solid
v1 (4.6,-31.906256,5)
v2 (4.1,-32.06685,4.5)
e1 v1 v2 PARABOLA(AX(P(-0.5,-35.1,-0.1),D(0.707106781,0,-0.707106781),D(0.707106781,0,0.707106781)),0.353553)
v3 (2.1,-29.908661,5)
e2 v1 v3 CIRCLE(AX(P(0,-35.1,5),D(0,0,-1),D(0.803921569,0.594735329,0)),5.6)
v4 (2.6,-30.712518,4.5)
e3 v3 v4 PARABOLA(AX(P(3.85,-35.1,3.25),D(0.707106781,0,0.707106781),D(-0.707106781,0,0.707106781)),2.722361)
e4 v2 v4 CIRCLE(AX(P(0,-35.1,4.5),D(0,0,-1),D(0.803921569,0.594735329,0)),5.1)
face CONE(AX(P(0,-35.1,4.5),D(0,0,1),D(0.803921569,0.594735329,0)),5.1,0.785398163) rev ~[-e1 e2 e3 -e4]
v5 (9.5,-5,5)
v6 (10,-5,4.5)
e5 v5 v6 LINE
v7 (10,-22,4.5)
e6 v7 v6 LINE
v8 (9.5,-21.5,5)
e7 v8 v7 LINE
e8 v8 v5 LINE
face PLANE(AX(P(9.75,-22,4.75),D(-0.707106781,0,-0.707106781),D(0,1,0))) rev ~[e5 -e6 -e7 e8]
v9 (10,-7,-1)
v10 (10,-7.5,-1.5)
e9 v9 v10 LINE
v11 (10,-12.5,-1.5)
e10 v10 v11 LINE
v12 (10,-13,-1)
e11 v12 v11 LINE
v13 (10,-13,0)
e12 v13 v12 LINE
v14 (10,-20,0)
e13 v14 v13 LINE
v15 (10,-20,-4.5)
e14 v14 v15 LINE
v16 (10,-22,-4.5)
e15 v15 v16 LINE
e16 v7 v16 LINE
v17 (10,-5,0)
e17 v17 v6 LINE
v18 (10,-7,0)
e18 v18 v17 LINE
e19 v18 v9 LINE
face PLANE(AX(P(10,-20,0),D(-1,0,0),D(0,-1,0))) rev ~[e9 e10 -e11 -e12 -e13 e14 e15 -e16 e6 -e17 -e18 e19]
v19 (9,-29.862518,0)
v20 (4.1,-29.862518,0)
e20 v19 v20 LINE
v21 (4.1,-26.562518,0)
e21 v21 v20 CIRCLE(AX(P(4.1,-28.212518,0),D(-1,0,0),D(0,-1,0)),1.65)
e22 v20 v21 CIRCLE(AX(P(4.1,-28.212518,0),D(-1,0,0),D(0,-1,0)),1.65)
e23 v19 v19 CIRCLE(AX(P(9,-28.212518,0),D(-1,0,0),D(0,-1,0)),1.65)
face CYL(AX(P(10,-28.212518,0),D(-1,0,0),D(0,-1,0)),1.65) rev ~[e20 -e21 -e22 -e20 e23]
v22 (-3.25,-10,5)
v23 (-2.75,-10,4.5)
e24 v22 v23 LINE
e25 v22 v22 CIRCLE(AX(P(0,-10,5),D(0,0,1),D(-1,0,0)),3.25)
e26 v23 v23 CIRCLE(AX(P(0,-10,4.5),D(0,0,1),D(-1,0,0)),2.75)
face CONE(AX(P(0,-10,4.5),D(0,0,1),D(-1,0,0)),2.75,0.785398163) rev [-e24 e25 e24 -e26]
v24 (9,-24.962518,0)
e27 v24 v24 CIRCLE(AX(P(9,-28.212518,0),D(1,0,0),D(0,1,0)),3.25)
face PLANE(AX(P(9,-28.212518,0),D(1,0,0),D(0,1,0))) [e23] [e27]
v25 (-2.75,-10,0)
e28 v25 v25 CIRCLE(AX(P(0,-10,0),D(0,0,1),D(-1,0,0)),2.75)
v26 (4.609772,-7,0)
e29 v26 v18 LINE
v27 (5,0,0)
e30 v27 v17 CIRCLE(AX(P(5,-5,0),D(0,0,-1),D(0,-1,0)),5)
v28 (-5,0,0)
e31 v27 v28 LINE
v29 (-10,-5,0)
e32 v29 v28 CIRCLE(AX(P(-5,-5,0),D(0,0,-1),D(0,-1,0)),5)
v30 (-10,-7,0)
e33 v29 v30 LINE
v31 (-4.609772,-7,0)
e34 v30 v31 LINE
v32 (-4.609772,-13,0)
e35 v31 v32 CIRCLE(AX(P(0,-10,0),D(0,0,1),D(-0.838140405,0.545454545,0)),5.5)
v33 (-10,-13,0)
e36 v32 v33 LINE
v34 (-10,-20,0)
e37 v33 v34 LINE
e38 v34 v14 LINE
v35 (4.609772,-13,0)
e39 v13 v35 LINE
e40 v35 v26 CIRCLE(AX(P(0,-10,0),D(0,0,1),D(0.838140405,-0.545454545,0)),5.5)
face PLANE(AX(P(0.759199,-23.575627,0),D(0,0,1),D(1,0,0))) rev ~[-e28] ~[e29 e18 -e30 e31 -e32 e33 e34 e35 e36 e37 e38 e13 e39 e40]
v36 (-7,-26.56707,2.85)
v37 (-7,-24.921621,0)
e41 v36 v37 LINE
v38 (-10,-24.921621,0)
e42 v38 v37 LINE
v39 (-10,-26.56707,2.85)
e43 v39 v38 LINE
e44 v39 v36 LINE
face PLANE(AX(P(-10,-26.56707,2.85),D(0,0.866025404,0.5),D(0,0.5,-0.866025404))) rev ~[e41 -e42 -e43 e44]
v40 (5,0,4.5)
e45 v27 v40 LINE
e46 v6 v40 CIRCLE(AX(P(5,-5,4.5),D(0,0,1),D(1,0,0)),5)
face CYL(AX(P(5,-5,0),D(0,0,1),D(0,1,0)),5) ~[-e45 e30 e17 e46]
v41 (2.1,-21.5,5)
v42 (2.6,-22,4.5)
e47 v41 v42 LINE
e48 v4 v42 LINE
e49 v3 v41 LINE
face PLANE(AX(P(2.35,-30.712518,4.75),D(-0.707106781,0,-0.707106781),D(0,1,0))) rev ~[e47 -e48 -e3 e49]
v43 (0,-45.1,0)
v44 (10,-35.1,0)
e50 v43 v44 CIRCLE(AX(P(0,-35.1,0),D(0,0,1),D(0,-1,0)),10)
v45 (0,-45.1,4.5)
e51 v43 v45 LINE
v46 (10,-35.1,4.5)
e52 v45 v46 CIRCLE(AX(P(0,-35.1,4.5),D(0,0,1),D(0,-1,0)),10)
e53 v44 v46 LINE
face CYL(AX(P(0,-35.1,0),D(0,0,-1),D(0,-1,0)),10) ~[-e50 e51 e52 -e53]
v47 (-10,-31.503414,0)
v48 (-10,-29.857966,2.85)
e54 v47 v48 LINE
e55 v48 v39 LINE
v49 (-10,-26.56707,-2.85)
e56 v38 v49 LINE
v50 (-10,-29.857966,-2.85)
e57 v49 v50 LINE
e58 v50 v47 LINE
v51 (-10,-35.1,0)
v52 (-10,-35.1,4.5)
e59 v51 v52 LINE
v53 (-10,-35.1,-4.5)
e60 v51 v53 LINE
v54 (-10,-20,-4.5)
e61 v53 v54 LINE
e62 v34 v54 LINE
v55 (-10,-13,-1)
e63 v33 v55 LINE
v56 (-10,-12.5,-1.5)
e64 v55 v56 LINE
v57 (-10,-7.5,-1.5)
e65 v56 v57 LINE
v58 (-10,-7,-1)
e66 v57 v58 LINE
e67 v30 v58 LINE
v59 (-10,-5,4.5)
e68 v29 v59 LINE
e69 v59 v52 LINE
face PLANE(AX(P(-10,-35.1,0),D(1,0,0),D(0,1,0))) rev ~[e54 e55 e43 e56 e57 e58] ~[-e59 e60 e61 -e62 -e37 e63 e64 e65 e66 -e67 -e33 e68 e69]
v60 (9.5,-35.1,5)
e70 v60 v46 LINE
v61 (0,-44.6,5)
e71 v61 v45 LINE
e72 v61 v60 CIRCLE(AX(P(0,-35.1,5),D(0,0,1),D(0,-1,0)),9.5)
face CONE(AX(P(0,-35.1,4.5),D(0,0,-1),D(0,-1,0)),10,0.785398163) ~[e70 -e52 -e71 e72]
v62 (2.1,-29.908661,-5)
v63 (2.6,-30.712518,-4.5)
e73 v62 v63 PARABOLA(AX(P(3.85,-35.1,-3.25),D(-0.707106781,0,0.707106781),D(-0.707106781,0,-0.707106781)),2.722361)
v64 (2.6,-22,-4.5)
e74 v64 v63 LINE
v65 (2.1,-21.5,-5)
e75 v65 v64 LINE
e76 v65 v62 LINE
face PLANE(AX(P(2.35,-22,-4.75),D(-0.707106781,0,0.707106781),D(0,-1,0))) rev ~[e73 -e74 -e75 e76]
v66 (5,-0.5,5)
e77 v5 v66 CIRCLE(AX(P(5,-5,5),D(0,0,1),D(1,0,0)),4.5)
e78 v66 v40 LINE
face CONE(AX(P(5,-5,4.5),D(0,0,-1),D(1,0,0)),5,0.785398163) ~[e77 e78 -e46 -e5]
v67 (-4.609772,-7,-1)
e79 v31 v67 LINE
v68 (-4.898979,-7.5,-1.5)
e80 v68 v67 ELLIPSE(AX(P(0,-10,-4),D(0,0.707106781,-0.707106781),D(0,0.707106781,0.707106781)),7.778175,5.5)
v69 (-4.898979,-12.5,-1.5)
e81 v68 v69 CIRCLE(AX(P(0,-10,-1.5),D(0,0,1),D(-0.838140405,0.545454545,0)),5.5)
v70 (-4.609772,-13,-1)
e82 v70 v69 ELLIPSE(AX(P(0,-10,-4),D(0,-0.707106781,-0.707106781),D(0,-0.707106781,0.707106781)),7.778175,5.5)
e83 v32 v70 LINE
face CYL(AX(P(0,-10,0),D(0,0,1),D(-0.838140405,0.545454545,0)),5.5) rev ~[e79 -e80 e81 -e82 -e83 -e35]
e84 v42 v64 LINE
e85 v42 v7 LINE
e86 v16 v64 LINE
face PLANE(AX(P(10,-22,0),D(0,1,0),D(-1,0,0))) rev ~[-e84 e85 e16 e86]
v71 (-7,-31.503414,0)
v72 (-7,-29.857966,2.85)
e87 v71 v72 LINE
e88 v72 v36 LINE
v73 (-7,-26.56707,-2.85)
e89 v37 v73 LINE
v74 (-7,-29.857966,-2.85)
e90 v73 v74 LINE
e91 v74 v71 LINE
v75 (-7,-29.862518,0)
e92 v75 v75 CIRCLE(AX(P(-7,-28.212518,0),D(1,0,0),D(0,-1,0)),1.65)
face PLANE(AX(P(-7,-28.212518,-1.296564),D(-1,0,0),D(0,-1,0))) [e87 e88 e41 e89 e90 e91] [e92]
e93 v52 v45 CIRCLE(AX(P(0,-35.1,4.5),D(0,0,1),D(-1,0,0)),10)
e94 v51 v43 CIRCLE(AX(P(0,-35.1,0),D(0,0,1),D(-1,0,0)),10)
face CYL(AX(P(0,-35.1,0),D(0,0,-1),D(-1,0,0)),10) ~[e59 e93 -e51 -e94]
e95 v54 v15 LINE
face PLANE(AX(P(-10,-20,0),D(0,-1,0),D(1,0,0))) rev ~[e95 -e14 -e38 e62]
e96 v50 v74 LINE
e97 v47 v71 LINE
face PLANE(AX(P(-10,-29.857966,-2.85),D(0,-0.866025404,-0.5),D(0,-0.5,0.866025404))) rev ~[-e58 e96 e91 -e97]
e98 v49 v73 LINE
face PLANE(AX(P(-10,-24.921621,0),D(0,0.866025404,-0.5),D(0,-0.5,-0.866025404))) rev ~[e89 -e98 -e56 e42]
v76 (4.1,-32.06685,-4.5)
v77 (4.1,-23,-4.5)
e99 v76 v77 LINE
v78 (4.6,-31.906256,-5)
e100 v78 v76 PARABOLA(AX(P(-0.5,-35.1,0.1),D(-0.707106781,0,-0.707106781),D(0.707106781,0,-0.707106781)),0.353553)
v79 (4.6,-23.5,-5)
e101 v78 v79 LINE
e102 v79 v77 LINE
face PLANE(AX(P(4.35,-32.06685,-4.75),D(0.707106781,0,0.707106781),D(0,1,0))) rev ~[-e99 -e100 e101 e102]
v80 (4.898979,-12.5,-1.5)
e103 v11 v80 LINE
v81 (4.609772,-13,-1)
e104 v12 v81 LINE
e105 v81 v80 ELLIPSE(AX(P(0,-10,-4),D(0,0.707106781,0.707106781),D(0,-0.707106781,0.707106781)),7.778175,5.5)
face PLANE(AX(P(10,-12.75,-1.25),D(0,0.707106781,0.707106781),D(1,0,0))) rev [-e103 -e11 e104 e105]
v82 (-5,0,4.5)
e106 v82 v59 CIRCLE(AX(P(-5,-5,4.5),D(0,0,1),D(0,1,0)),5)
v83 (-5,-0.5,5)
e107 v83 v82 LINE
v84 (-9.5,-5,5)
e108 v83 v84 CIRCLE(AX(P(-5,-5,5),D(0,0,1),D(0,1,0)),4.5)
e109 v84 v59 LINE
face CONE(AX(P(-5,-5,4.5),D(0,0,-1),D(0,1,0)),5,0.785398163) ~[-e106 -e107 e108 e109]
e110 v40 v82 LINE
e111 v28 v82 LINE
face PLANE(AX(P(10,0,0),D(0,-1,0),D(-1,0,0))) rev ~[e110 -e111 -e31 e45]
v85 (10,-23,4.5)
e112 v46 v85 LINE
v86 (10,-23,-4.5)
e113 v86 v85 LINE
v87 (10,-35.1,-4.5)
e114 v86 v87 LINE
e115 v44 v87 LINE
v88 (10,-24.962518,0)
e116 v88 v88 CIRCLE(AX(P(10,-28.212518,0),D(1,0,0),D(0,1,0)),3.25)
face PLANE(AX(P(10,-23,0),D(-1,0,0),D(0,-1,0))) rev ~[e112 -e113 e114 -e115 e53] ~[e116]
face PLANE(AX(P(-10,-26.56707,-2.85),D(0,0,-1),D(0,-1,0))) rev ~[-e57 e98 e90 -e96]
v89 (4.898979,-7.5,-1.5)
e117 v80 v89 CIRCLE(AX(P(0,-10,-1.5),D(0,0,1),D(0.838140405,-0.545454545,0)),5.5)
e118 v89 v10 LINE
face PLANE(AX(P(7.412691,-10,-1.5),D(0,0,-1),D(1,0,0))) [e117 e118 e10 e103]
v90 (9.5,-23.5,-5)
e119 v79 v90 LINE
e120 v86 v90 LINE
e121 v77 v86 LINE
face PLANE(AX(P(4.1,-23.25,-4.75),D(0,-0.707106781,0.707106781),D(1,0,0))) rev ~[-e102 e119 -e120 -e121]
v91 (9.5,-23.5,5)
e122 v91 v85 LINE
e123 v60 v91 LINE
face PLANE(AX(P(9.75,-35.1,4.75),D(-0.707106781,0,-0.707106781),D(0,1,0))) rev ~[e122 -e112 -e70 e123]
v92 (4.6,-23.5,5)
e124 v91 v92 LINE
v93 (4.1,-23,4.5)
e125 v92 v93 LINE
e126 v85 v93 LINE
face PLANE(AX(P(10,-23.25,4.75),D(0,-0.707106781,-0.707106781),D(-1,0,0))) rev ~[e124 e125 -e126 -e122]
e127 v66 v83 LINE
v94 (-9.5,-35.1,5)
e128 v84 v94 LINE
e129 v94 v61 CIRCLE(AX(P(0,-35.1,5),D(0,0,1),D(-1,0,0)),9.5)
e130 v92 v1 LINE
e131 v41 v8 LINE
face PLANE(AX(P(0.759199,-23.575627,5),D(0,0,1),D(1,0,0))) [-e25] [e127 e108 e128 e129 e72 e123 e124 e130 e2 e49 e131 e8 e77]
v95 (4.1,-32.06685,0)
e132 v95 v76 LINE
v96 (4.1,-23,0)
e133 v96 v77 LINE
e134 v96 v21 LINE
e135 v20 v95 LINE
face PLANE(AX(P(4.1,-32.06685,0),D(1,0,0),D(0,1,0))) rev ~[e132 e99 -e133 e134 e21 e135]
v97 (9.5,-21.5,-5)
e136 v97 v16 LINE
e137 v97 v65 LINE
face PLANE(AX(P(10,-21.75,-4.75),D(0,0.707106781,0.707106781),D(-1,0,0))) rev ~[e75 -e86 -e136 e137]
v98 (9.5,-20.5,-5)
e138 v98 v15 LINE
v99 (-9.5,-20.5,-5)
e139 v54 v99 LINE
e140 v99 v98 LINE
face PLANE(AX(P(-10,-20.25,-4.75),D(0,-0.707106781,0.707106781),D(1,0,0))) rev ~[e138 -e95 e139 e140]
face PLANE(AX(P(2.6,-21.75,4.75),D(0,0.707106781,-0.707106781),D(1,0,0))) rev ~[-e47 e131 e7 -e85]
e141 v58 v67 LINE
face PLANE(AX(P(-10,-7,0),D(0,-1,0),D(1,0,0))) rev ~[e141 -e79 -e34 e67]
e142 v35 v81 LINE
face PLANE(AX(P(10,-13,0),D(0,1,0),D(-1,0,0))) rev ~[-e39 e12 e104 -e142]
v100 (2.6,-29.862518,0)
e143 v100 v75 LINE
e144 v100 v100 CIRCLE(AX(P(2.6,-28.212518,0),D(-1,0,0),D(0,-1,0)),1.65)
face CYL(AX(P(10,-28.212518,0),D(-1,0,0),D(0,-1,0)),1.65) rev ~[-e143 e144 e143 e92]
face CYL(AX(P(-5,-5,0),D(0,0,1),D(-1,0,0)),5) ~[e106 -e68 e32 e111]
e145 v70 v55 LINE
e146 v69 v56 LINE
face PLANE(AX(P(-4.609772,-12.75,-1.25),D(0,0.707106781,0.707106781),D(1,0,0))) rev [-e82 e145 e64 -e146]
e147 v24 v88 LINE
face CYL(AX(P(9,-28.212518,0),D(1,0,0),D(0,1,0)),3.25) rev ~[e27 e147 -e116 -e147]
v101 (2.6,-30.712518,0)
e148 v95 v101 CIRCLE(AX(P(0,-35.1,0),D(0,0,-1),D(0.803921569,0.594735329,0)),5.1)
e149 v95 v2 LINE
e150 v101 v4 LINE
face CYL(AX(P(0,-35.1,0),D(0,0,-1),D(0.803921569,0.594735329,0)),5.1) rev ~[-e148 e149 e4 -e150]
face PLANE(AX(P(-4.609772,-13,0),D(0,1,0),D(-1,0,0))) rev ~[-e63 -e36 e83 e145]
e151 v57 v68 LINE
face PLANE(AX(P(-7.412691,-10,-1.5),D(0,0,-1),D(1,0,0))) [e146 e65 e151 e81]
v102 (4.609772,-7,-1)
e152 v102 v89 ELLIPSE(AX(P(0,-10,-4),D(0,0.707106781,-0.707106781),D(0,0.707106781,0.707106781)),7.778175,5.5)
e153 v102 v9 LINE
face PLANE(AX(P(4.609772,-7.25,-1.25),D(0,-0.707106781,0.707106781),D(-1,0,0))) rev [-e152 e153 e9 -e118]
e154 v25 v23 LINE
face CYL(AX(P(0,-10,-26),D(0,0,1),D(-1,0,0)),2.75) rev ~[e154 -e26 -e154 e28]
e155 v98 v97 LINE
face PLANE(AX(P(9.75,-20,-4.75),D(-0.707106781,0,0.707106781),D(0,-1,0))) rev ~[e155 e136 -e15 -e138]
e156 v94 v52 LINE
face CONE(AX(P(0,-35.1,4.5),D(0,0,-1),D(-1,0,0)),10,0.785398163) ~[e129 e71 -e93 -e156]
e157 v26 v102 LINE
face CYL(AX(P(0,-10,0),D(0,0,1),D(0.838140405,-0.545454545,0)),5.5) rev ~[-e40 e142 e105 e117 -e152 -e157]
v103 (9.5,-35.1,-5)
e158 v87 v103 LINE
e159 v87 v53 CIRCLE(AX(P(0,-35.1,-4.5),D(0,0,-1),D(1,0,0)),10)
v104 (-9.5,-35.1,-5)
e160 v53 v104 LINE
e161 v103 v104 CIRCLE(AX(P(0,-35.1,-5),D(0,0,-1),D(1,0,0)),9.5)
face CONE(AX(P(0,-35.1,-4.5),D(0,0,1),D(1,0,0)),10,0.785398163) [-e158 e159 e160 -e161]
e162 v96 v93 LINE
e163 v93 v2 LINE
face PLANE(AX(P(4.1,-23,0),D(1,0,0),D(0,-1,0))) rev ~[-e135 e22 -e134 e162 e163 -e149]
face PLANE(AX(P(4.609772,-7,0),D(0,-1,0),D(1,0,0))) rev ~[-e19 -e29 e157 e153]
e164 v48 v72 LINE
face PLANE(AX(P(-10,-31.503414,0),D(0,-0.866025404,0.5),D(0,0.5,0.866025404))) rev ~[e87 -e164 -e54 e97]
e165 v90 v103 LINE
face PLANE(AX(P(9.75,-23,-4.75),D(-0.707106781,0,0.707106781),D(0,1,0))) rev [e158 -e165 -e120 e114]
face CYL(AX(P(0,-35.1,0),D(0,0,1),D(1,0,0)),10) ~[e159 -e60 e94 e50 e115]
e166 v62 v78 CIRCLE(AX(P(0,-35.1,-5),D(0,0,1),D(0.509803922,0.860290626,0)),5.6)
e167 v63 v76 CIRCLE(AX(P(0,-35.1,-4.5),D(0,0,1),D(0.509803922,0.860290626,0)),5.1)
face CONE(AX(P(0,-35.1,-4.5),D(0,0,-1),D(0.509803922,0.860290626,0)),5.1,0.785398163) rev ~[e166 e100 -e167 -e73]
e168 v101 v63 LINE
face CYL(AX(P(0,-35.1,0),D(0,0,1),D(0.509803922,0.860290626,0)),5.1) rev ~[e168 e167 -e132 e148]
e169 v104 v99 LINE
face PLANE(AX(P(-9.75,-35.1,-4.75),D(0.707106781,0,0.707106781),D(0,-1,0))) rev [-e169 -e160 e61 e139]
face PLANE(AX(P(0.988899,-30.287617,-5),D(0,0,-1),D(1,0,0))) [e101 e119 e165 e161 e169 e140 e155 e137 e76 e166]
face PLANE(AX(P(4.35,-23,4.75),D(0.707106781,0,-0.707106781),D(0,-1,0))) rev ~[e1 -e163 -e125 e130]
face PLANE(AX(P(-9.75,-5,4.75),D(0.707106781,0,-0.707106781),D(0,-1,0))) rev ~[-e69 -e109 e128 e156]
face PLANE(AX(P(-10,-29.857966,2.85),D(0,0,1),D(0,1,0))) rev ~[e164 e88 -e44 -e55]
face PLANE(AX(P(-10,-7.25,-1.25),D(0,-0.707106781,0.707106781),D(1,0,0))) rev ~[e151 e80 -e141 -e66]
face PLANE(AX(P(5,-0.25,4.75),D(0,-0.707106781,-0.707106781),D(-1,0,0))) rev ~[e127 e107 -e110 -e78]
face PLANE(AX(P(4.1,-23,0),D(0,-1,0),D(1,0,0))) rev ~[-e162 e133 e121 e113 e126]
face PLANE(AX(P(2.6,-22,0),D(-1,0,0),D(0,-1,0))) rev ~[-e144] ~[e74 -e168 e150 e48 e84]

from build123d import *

# Parameters (mm, degrees)
F1_DEPTH       = 5
F3_DEPTH       = 5
F5_D           = 3.3
F5_DEPTH       = 26
F5_CBORE_D     = 6.5
F5_CBORE_DEPTH = 1
F5_TIP         = 0.9914200214
F7_DEPTH       = 3
F9_DEPTH       = 1.5
F10_D          = 5.5
F10_DEPTH      = 26
F10_TIP        = 1.6523667023
F11_SIZE       = 0.5
F13_R          = 5
F14_SIZE       = 0.5


with BuildPart() as f1:
    # F0 (on Top) → F1 (new body)
    with BuildSketch(Plane.XY):
        with BuildLine():
            Line((10, 0), (-10, 0))
            Line((-10, 0), (-10, -35.1))
            ThreePointArc((-10, -35.1), (-7.0710678119, -42.1710678119), (0, -45.1))
            ThreePointArc((0, -45.1), (7.0710678119, -42.1710678119), (10, -35.1))
            Line((10, -35.1), (10, -23))
            Line((10, -23), (4.1, -23))
            Line((4.1, -23), (4.1, -32.0668498224))
            ThreePointArc((4.1, -32.0668498224), (-3.4177556675, -38.8853594542), (2.6, -30.7125178063))
            Line((2.6, -30.7125178063), (2.6, -22))
            Line((2.6, -22), (10, -22))
            Line((10, -22), (10, 0))
        make_face()
    extrude(amount=F1_DEPTH)

    # F2 (on face) → F3 (join)
    with BuildSketch(Plane(origin=(0, 0, 0), x_dir=(1, 0, 0), z_dir=(0, 0, -1))):
        with BuildLine():
            Line((-10, 35.1), (-10, 20))
            Line((-10, 20), (10, 20))
            Line((10, 20), (10, 22))
            Line((10, 22), (2.6, 22))
            Line((2.6, 22), (2.6, 30.7125178063))
            ThreePointArc((2.6, 30.7125178063), (-3.4177556675, 38.8853594542), (4.1, 32.0668498224))
            Line((4.1, 32.0668498224), (4.1, 23))
            Line((4.1, 23), (10, 23))
            Line((10, 23), (10, 35.1))
            ThreePointArc((10, 35.1), (0, 45.1), (-10, 35.1))
        make_face()
    extrude(amount=F3_DEPTH)

    # F5
    with Locations(Plane.YZ.offset(10)):
        with Locations((-28.2125178063, 0)):
            CounterBoreHole(F5_D / 2, F5_CBORE_D / 2, F5_CBORE_DEPTH, depth=F5_DEPTH)
            with Locations((0, 0, -(F5_DEPTH + F5_TIP / 2))):  # 118° drill point
                Cone(0, F5_D / 2, F5_TIP, mode=Mode.SUBTRACT)

    # F6 (on face) → F7 (cut)
    with BuildSketch(Plane(origin=(-10, 0, 0), x_dir=(0, -1, 0), z_dir=(-1, 0, 0))):
        with BuildLine():
            Line((24.9216212719, 0), (26.5670695391, -2.85))
            Line((26.5670695391, -2.85), (29.8579660735, -2.85))
            Line((29.8579660735, -2.85), (31.5034143407, 0))
            Line((31.5034143407, 0), (29.8625178063, 0))
            ThreePointArc((29.8625178063, 0), (28.2125178063, -1.65), (26.5625178063, 0))
            Line((26.5625178063, 0), (24.9216212719, 0))
        make_face()
        with BuildLine():
            Line((26.5670695391, 2.85), (24.9216212719, 0))
            Line((24.9216212719, 0), (26.5625178063, 0))
            ThreePointArc((26.5625178063, 0), (28.2125178063, 1.65), (29.8625178063, 0))
            Line((29.8625178063, 0), (31.5034143407, 0))
            Line((31.5034143407, 0), (29.8579660735, 2.85))
            Line((29.8579660735, 2.85), (26.5670695391, 2.85))
        make_face()
    extrude(amount=-F7_DEPTH, mode=Mode.SUBTRACT)

    # F8 (on face) → F9 (join)
    with BuildSketch(Plane(origin=(0, 0, 0), x_dir=(1, 0, 0), z_dir=(0, 0, -1))):
        with BuildLine():
            ThreePointArc((-4.6097722286, 7), (-5.5, 10), (-4.6097722286, 13))
            Line((-4.6097722286, 13), (-10, 13))
            Line((-10, 13), (-10, 7))
            Line((-10, 7), (-4.6097722286, 7))
        make_face()
        with BuildLine():
            Line((10, 7), (10, 13))
            Line((10, 13), (4.6097722286, 13))
            ThreePointArc((4.6097722286, 13), (5.5, 10), (4.6097722286, 7))
            Line((4.6097722286, 7), (10, 7))
        make_face()
    extrude(amount=F9_DEPTH)

    # F10
    with Locations(Plane(origin=(0, 0, 0), x_dir=(1, 0, 0), z_dir=(0, 0, -1))):
        with Locations((0, 10)):
            Hole(F10_D / 2, depth=F10_DEPTH)
            with Locations((0, 0, -(F10_DEPTH + F10_TIP / 2))):  # 118° drill point
                Cone(0, F10_D / 2, F10_TIP, mode=Mode.SUBTRACT)

    # F11
    f11_edges = [f1.edges().sort_by_distance(p)[0] for p in [
        (-7.304886, -7, -1.5),
        (-7.304886, -13, -1.5),
        (7.304886, -13, -1.5),
        (7.304886, -7, -1.5),
    ]]
    chamfer(f11_edges, length=F11_SIZE)

    # F13
    f13_edges = [f1.edges().sort_by_distance(p)[0] for p in [
        (10, 0, 2.5),
        (-10, 0, 2.5),
    ]]
    fillet(f13_edges, radius=F13_R)

    # F14
    f14_edges = [f1.edges().sort_by_distance(p)[0] for p in [
        (10, -13.5, 5),
        (8.535534, -1.464466, 5),
        (6.3, -22, 5),
        (0, 0, 5),
        (2.6, -26.356259, 5),
        (-8.535534, -1.464466, 5),
        (-3.417756, -38.885359, 5),
        (-10, -20.05, 5),
        (4.1, -27.533425, 5),
        (0, -45.1, 5),
        (7.05, -23, 5),
        (10, -29.05, 5),
        (-2.75, -10, 5),
        (0, -45.1, -5),
        (-10, -27.55, -5),
        (0, -20, -5),
        (10, -21, -5),
        (6.3, -22, -5),
        (2.6, -26.356259, -5),
        (-3.417756, -38.885359, -5),
        (4.1, -27.533425, -5),
        (7.05, -23, -5),
        (10, -29.05, -5),
    ]]
    chamfer(f14_edges, length=F14_SIZE)


solid = f1.part
